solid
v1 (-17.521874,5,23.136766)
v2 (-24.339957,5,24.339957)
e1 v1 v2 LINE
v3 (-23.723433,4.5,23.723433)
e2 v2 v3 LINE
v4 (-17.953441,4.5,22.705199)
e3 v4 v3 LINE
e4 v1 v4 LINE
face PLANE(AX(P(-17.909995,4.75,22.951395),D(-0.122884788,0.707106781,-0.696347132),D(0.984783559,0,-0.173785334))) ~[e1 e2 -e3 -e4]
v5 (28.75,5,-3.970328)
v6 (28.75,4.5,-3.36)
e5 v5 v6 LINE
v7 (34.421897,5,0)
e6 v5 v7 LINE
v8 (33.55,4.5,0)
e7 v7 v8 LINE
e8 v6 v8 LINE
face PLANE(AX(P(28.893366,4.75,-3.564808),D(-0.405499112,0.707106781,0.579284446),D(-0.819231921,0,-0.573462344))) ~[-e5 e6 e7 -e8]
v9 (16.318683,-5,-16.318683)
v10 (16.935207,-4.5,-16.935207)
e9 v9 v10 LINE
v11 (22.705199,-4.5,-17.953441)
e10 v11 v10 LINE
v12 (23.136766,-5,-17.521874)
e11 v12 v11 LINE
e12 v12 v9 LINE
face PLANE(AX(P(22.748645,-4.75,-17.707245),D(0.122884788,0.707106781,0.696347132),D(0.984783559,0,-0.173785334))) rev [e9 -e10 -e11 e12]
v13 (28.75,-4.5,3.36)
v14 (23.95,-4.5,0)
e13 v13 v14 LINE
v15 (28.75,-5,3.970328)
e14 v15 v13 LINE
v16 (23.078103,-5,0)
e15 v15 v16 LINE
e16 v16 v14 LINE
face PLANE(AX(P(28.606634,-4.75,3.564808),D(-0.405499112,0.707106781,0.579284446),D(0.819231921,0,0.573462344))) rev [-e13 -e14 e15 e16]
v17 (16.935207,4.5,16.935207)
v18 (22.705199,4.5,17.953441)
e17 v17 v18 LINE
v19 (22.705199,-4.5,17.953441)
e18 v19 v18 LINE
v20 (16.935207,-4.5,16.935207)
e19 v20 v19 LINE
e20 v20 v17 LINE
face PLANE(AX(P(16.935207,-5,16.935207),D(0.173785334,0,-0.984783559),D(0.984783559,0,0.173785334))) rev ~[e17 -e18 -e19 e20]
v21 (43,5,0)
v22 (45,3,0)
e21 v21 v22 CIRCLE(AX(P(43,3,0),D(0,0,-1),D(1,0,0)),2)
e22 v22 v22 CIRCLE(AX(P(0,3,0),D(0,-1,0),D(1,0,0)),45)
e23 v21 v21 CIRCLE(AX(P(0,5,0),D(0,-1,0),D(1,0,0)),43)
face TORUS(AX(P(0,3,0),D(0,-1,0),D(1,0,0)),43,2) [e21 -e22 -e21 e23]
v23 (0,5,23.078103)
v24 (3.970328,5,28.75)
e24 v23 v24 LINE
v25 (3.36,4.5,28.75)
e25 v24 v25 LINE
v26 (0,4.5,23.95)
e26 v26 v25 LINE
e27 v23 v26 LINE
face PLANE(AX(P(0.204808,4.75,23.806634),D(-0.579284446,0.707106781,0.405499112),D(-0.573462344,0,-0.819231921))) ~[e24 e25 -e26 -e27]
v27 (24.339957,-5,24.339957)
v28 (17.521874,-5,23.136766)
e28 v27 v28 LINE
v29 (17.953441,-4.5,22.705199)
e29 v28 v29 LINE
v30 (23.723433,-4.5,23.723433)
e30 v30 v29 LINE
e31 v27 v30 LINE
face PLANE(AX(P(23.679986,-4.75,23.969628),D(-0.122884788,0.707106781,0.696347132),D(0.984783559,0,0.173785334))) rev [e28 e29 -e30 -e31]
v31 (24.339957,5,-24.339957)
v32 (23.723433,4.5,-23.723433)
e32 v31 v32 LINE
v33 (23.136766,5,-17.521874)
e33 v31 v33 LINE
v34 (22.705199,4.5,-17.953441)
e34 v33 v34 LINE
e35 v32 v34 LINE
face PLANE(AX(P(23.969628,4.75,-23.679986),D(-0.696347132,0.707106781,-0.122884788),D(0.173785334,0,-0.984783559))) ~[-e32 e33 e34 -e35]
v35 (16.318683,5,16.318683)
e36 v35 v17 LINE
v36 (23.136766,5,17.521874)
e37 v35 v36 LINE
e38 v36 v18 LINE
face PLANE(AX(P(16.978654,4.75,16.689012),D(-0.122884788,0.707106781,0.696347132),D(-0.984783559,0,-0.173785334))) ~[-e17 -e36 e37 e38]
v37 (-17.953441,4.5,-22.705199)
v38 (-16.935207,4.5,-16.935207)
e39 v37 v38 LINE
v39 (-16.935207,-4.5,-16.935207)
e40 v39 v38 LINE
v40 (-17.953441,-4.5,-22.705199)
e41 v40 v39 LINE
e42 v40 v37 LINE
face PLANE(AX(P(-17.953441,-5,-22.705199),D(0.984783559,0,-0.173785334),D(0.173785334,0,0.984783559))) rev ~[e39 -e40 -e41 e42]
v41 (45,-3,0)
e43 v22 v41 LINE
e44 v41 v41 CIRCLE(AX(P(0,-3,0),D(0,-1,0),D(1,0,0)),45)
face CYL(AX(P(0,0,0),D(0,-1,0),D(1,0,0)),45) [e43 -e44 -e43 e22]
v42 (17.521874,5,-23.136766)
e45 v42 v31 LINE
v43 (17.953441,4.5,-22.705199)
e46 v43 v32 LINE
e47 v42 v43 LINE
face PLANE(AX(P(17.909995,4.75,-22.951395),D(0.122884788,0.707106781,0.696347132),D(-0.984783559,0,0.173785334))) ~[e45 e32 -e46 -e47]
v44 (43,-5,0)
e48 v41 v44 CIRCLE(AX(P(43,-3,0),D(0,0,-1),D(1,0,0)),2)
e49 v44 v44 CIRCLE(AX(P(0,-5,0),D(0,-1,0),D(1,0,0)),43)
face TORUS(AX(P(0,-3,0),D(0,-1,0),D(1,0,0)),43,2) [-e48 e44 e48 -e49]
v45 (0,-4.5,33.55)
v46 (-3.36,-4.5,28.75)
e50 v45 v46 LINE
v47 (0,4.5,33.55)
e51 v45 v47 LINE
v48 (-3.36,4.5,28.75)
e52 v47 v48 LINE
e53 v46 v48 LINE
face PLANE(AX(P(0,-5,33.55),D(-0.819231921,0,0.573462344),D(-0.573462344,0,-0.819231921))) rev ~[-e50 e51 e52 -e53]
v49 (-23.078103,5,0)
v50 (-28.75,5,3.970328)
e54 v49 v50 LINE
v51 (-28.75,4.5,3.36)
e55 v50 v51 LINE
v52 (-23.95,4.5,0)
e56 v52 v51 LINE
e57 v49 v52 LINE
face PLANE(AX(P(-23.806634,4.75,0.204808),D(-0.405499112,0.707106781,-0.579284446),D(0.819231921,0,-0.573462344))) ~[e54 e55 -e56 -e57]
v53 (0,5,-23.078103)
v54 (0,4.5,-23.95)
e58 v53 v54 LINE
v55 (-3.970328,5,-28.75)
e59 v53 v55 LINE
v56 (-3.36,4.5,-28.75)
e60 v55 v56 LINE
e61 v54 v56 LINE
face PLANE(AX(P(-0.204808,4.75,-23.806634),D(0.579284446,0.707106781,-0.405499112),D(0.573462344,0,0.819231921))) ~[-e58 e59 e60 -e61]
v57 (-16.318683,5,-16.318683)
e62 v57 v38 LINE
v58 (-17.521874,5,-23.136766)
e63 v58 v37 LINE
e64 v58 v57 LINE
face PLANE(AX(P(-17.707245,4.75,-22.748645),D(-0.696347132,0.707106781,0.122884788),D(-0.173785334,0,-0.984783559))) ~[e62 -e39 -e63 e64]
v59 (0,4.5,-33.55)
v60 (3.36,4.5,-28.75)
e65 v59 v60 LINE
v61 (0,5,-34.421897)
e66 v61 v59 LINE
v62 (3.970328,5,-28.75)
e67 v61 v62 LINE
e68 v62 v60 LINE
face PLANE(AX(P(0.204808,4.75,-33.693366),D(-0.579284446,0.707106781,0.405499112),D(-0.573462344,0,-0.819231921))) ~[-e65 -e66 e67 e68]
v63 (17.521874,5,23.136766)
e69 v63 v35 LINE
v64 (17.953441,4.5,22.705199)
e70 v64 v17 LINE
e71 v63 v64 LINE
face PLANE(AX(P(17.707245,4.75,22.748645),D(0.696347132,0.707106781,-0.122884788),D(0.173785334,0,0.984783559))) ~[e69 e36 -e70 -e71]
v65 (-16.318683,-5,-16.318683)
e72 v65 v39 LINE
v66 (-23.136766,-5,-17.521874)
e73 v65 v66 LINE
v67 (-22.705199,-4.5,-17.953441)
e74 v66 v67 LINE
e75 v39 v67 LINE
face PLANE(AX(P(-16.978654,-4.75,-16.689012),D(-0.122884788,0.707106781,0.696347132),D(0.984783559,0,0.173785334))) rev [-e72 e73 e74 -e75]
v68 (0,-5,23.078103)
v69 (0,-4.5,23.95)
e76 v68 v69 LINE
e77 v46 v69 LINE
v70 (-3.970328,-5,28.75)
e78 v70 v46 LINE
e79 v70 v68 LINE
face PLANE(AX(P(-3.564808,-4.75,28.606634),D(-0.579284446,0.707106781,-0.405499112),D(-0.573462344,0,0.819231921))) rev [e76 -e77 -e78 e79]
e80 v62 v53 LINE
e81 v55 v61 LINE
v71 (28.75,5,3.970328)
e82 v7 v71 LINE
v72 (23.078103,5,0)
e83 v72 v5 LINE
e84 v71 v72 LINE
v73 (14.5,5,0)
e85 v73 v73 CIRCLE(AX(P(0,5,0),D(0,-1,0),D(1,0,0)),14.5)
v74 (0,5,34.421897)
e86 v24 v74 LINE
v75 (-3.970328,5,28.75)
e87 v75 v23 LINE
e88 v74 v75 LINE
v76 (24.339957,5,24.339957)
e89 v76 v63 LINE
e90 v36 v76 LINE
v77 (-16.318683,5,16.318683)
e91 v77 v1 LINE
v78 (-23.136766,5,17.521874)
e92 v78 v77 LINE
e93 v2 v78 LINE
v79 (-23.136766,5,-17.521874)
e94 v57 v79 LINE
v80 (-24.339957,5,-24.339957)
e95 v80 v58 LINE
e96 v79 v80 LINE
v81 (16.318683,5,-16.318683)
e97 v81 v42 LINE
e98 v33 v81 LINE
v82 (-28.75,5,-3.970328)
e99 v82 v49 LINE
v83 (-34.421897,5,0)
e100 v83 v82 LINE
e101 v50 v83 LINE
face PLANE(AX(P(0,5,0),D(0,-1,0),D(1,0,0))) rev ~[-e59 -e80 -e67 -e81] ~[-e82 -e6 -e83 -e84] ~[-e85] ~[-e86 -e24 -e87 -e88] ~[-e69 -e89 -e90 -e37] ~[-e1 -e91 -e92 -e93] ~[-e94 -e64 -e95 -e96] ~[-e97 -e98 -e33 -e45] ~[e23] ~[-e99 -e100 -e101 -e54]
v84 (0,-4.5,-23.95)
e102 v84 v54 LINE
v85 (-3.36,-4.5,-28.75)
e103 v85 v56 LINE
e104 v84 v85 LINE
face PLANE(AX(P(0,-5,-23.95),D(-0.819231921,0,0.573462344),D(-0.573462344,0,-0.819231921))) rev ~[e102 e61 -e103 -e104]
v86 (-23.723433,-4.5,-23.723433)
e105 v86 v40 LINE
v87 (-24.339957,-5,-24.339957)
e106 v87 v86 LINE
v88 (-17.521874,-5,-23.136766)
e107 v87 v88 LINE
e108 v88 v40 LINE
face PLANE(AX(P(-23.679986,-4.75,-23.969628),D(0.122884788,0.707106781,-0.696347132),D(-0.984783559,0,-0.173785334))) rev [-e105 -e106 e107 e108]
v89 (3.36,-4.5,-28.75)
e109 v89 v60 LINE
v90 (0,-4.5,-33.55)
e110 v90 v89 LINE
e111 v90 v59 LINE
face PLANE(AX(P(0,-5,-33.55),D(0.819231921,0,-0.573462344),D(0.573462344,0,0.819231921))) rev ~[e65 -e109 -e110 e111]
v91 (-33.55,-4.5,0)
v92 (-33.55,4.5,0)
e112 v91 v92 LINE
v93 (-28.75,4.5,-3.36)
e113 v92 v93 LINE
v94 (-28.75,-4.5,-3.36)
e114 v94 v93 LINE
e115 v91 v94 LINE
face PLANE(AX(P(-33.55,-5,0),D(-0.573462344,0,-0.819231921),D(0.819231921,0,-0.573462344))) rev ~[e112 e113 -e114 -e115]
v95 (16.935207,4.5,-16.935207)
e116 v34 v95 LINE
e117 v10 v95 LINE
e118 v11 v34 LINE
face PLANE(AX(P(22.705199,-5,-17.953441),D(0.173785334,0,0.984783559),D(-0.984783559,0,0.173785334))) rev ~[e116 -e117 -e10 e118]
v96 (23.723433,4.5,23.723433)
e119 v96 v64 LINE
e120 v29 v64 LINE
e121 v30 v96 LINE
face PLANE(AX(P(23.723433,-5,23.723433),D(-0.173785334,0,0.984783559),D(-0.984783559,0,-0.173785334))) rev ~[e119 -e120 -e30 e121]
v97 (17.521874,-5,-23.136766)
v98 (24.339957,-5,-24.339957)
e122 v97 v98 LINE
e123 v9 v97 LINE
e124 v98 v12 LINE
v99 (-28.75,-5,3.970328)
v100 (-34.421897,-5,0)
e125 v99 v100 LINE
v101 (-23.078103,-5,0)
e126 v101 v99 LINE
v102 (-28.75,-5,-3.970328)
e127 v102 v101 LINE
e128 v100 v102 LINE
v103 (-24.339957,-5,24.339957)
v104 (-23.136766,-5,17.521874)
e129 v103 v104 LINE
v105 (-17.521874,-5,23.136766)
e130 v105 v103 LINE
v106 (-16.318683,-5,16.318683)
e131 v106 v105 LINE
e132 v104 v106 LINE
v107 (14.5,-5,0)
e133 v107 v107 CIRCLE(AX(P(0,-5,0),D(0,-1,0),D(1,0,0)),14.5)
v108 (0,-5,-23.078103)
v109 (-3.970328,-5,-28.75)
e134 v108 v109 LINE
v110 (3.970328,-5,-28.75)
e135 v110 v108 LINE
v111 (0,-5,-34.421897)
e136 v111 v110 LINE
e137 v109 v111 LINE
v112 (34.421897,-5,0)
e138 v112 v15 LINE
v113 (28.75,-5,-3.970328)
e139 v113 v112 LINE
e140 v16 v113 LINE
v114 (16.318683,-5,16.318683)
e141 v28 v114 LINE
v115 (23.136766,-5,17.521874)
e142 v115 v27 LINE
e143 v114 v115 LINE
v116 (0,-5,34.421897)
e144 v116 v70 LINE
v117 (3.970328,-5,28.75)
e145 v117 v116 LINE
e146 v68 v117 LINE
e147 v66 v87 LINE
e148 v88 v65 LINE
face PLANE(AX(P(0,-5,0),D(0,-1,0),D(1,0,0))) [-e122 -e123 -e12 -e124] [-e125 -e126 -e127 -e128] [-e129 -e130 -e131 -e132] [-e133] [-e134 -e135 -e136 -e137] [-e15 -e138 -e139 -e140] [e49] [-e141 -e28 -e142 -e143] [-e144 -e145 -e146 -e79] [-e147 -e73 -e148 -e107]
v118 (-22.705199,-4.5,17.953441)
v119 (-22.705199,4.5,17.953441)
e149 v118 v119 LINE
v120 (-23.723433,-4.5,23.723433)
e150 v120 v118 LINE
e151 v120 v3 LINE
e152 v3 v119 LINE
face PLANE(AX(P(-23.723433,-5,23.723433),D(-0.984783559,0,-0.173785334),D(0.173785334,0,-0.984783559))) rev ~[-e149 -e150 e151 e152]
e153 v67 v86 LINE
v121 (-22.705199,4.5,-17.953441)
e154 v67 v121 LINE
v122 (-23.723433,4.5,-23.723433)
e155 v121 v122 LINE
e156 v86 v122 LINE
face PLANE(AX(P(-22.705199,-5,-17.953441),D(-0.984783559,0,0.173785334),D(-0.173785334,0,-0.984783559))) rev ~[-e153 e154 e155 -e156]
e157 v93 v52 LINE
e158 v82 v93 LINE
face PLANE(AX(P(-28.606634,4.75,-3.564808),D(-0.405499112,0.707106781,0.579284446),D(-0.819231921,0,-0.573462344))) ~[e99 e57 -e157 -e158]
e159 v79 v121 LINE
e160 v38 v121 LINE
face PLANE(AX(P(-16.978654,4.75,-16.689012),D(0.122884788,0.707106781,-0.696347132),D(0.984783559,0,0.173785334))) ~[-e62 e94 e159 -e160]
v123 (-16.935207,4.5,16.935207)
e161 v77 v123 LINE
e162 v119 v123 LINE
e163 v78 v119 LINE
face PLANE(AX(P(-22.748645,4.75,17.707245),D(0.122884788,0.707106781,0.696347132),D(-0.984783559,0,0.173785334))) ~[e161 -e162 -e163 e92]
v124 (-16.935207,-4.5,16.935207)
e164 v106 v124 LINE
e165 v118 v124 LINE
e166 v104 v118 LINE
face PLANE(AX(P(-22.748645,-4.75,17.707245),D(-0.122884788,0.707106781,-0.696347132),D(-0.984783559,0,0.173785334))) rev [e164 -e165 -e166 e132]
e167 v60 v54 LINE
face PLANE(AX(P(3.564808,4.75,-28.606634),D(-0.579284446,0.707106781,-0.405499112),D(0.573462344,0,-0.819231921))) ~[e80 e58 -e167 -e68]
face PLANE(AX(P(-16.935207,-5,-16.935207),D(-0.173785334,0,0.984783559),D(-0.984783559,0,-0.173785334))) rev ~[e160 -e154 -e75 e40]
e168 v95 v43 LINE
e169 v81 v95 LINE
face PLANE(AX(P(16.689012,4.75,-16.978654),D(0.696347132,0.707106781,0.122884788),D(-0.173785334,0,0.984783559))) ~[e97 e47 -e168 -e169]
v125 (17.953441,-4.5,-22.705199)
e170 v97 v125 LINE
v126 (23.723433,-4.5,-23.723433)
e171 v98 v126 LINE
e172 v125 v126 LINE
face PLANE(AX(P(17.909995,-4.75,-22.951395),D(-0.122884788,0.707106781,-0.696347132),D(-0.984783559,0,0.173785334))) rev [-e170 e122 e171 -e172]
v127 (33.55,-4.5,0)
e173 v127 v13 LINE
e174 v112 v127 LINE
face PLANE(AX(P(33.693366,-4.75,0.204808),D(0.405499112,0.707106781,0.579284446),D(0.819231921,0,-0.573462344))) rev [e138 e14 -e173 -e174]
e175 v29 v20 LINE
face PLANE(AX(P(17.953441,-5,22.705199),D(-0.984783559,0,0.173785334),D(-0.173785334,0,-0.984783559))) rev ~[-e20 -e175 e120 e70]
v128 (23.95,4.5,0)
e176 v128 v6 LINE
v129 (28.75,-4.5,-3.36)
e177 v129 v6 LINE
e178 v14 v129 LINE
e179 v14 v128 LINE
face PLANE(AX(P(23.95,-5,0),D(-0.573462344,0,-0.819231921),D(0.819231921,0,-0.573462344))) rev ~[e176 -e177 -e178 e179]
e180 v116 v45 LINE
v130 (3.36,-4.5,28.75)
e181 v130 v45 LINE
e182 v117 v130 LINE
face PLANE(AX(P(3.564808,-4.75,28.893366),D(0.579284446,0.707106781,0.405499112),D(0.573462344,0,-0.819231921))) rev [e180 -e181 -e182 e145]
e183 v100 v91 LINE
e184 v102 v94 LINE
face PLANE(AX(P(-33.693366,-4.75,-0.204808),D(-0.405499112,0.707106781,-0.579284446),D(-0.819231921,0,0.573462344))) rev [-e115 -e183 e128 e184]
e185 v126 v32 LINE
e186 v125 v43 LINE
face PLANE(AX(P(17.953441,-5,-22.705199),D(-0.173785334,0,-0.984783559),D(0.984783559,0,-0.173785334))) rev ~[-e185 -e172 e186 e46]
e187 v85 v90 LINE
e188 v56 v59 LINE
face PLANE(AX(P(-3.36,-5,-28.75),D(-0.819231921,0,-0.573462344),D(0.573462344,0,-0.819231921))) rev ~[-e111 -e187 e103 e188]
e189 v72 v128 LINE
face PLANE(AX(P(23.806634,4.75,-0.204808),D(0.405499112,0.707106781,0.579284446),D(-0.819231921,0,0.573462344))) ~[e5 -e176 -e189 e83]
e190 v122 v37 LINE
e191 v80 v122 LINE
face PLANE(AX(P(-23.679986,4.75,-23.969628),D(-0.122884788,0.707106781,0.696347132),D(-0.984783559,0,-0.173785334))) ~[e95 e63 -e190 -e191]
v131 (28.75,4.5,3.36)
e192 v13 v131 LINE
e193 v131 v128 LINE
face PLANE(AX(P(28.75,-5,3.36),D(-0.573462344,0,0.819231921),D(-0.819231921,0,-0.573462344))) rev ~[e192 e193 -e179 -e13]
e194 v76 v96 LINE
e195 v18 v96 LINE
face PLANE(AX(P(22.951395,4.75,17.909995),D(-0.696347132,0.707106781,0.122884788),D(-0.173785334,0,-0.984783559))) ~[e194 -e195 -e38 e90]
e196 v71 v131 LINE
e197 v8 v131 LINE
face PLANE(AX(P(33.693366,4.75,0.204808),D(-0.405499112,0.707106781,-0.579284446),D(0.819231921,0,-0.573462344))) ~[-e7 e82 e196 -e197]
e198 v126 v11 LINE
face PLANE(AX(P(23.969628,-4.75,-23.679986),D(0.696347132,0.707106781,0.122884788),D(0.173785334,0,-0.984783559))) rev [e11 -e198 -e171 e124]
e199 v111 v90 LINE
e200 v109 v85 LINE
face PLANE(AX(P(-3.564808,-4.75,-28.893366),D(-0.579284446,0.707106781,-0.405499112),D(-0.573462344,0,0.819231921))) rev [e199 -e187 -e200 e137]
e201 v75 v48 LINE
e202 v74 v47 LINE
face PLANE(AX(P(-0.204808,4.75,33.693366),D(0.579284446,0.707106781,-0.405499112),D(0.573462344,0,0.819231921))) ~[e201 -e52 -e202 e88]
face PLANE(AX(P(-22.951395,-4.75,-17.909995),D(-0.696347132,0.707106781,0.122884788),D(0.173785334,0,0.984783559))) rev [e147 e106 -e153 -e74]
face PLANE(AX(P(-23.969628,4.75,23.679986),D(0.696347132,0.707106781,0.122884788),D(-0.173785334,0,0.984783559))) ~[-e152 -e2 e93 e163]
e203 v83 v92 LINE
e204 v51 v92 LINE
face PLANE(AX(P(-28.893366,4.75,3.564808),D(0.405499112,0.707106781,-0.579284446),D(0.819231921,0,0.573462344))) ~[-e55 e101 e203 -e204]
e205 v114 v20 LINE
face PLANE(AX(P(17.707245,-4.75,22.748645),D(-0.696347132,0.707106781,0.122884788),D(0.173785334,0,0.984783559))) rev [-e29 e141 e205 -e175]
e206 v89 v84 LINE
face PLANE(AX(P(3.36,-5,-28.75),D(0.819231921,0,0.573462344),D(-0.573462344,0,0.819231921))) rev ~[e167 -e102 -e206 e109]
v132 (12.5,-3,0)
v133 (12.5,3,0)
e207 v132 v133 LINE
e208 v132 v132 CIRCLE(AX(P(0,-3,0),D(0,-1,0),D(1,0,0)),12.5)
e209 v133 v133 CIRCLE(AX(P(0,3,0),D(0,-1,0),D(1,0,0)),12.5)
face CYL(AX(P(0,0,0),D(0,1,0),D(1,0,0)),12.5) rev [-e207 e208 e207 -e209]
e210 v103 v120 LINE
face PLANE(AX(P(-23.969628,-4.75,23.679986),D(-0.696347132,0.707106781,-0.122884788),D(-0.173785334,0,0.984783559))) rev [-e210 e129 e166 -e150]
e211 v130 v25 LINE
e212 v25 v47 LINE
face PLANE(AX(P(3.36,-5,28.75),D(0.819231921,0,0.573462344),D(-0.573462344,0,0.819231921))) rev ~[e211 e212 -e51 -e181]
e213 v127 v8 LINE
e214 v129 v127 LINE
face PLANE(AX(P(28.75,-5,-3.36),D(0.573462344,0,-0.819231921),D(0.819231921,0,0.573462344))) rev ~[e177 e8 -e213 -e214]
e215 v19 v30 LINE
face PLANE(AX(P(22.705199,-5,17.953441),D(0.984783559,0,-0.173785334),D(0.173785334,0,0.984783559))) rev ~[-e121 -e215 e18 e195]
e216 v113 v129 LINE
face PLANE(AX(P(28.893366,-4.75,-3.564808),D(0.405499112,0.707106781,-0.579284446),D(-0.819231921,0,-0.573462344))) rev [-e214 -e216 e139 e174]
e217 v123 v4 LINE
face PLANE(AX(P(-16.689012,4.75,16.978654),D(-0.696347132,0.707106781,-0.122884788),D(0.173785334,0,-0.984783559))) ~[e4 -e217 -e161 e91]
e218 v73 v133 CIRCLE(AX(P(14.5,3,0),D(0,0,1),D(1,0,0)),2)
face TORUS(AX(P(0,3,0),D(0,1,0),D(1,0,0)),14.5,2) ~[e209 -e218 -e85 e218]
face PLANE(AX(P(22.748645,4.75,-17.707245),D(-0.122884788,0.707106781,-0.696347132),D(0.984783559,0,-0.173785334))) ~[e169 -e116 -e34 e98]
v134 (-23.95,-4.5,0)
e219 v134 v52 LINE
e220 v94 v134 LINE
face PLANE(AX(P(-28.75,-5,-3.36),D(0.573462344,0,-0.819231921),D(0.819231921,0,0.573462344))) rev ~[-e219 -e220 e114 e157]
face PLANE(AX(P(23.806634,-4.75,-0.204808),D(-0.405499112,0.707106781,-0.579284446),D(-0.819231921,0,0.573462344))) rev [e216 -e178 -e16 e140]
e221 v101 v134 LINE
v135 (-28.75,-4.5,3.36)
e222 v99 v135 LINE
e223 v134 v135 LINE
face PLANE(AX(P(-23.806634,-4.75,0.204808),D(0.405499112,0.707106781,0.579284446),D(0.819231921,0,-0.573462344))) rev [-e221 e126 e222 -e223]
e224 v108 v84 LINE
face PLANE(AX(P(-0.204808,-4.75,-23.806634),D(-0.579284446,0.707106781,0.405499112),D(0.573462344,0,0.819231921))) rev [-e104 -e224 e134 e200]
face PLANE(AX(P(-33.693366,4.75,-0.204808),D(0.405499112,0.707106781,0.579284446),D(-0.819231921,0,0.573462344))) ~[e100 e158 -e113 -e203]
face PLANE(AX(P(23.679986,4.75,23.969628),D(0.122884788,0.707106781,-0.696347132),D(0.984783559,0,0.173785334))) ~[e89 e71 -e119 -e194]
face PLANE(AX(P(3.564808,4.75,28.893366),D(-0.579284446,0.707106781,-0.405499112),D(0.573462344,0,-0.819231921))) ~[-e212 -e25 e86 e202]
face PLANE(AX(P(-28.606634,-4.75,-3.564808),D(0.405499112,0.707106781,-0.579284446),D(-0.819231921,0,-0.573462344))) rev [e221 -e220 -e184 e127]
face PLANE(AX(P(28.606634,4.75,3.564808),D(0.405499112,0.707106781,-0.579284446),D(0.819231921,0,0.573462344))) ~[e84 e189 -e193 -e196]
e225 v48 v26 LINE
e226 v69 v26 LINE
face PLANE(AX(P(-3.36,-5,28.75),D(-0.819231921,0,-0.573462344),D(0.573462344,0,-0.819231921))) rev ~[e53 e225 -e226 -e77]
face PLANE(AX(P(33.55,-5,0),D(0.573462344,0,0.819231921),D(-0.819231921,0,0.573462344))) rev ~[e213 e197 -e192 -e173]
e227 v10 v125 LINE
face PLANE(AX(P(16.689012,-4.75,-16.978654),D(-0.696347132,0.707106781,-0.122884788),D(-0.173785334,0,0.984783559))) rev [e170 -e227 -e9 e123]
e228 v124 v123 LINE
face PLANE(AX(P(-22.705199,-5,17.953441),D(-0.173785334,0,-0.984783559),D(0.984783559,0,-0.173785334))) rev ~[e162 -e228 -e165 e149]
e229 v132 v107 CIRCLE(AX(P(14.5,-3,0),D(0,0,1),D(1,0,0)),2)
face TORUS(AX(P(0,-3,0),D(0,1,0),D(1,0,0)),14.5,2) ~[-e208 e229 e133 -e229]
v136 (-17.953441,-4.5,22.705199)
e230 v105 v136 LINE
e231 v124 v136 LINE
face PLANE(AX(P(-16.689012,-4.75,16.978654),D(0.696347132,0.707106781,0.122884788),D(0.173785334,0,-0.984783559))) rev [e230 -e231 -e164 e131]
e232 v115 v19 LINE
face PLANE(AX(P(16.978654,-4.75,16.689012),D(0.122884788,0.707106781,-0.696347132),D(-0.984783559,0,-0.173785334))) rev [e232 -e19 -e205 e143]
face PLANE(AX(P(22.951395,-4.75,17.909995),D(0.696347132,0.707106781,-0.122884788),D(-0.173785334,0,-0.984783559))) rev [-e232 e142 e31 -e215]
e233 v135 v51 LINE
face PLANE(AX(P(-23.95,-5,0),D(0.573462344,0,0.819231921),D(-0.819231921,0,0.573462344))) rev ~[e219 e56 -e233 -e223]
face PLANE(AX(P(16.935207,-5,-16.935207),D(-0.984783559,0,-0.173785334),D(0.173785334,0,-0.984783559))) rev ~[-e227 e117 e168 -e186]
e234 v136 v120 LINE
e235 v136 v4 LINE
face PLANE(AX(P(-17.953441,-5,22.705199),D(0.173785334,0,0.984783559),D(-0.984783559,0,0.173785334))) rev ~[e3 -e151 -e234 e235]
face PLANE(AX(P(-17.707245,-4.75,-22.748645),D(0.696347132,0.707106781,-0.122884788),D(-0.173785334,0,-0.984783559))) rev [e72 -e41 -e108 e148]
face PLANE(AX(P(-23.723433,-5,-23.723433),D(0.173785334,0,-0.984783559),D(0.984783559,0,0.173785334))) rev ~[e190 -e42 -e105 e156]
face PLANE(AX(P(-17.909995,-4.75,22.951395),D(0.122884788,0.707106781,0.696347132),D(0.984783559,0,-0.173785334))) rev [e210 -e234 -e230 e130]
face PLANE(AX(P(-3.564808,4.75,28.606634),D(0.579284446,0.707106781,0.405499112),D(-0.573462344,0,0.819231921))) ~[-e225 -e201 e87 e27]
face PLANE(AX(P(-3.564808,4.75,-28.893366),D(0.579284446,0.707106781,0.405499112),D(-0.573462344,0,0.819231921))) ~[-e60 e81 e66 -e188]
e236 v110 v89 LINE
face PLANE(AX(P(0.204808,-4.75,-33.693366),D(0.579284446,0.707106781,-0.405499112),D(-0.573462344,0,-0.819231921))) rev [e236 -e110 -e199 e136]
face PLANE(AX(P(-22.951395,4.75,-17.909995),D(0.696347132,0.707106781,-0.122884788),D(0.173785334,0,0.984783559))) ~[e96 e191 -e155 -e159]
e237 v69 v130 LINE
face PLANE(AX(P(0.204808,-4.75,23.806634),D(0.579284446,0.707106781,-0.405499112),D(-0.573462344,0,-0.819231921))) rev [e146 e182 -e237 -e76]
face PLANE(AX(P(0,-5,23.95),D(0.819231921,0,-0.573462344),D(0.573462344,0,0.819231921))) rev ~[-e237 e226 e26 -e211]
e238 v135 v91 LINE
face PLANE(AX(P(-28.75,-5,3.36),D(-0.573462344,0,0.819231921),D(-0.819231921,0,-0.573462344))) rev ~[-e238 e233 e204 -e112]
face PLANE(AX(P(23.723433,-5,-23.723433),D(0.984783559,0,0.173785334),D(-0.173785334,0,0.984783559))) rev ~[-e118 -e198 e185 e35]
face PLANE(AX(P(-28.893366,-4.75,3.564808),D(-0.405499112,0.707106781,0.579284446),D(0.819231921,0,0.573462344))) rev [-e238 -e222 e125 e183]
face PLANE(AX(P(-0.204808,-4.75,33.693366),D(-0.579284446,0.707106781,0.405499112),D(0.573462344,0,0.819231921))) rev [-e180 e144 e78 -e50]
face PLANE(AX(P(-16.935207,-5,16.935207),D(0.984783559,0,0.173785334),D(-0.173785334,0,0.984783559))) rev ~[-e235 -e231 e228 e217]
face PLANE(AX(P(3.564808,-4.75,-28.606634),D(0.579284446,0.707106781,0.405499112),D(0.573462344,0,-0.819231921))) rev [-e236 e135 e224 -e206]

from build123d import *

# Parameters (mm, degrees)
F0_R            = 45
F0_R_2          = 12.5
F1_DEPTH        = 5
F3_DEPTH        = 10.001
F3_COPIES_COUNT = 8
F4_SIZE         = 0.5
F5_R            = 2


# Not quite as in the source:
# - a pattern or mirror of a feature is missing from the dataset's text; its kind, count and spacing are read off the source's solid


with BuildPart() as f1:
    # F0 (on Front) → F1 (new body, symmetric)
    with BuildSketch(Plane.XZ):
        Circle(F0_R)
        Circle(F0_R_2, mode=Mode.SUBTRACT)
    extrude(amount=F1_DEPTH, both=True)

    # F2 (on face) → F3 (cut, through all)
    with BuildSketch(Plane.XZ.offset(5)):
        Polygon((3.36, 28.75), (0, 33.55), (-3.36, 28.75), (0, 23.95), align=None)
    f3 = extrude(amount=-F3_DEPTH, mode=Mode.SUBTRACT)

    # F3_copies: F3 ×8 about axis
    f3_copies_axis = Axis((0, 0, 0), (0, 1, 0))
    for i in range(1, F3_COPIES_COUNT):
        add(f3.rotate(f3_copies_axis, i * 360 / F3_COPIES_COUNT), mode=Mode.SUBTRACT)

    # F4
    f4_edges = [f1.edges().sort_by_distance(p)[0] for p in [
        (1.68, -5, 31.15),
        (-1.68, -5, 31.15),
        (-1.68, -5, 26.35),
        (1.68, -5, 26.35),
        (1.68, 5, 31.15),
        (-1.68, 5, 31.15),
        (-1.68, 5, 26.35),
        (1.68, 5, 26.35),
        (-23.214316, 5, -20.838437),
        (-19.820203, 5, -17.444324),
        (-20.838437, 5, -23.214316),
        (-17.444324, 5, -19.820203),
        (-31.15, 5, 1.68),
        (-26.35, 5, 1.68),
        (-31.15, 5, -1.68),
        (-26.35, 5, -1.68),
        (-1.68, 5, -31.15),
        (-1.68, 5, -26.35),
        (1.68, 5, -31.15),
        (1.68, 5, -26.35),
        (20.838437, 5, -23.214316),
        (17.444324, 5, -19.820203),
        (23.214316, 5, -20.838437),
        (19.820203, 5, -17.444324),
        (-20.838437, 5, 23.214316),
        (-23.214316, 5, 20.838437),
        (-19.820203, 5, 17.444324),
        (-17.444324, 5, 19.820203),
        (31.15, 5, -1.68),
        (26.35, 5, -1.68),
        (31.15, 5, 1.68),
        (26.35, 5, 1.68),
        (23.214316, 5, 20.838437),
        (19.820203, 5, 17.444324),
        (20.838437, 5, 23.214316),
        (17.444324, 5, 19.820203),
        (-23.214316, -5, -20.838437),
        (-19.820203, -5, -17.444324),
        (-20.838437, -5, -23.214316),
        (-17.444324, -5, -19.820203),
        (-31.15, -5, 1.68),
        (-26.35, -5, 1.68),
        (-31.15, -5, -1.68),
        (-26.35, -5, -1.68),
        (-1.68, -5, -31.15),
        (-1.68, -5, -26.35),
        (1.68, -5, -31.15),
        (1.68, -5, -26.35),
        (20.838437, -5, -23.214316),
        (17.444324, -5, -19.820203),
        (23.214316, -5, -20.838437),
        (19.820203, -5, -17.444324),
        (-20.838437, -5, 23.214316),
        (-23.214316, -5, 20.838437),
        (-19.820203, -5, 17.444324),
        (-17.444324, -5, 19.820203),
        (31.15, -5, -1.68),
        (26.35, -5, -1.68),
        (31.15, -5, 1.68),
        (26.35, -5, 1.68),
        (23.214316, -5, 20.838437),
        (19.820203, -5, 17.444324),
        (20.838437, -5, 23.214316),
        (17.444324, -5, 19.820203),
    ]]
    chamfer(f4_edges, length=F4_SIZE)

    # F5
    f5_edges = [f1.edges().sort_by_distance(p)[0] for p in [
        (-45, -5, 0),
        (-45, 5, 0),
        (-12.5, -5, 0),
        (12.5, 0, 0),
        (-12.5, 5, 0),
    ]]
    fillet(f5_edges, radius=F5_R)


solid = f1.part
